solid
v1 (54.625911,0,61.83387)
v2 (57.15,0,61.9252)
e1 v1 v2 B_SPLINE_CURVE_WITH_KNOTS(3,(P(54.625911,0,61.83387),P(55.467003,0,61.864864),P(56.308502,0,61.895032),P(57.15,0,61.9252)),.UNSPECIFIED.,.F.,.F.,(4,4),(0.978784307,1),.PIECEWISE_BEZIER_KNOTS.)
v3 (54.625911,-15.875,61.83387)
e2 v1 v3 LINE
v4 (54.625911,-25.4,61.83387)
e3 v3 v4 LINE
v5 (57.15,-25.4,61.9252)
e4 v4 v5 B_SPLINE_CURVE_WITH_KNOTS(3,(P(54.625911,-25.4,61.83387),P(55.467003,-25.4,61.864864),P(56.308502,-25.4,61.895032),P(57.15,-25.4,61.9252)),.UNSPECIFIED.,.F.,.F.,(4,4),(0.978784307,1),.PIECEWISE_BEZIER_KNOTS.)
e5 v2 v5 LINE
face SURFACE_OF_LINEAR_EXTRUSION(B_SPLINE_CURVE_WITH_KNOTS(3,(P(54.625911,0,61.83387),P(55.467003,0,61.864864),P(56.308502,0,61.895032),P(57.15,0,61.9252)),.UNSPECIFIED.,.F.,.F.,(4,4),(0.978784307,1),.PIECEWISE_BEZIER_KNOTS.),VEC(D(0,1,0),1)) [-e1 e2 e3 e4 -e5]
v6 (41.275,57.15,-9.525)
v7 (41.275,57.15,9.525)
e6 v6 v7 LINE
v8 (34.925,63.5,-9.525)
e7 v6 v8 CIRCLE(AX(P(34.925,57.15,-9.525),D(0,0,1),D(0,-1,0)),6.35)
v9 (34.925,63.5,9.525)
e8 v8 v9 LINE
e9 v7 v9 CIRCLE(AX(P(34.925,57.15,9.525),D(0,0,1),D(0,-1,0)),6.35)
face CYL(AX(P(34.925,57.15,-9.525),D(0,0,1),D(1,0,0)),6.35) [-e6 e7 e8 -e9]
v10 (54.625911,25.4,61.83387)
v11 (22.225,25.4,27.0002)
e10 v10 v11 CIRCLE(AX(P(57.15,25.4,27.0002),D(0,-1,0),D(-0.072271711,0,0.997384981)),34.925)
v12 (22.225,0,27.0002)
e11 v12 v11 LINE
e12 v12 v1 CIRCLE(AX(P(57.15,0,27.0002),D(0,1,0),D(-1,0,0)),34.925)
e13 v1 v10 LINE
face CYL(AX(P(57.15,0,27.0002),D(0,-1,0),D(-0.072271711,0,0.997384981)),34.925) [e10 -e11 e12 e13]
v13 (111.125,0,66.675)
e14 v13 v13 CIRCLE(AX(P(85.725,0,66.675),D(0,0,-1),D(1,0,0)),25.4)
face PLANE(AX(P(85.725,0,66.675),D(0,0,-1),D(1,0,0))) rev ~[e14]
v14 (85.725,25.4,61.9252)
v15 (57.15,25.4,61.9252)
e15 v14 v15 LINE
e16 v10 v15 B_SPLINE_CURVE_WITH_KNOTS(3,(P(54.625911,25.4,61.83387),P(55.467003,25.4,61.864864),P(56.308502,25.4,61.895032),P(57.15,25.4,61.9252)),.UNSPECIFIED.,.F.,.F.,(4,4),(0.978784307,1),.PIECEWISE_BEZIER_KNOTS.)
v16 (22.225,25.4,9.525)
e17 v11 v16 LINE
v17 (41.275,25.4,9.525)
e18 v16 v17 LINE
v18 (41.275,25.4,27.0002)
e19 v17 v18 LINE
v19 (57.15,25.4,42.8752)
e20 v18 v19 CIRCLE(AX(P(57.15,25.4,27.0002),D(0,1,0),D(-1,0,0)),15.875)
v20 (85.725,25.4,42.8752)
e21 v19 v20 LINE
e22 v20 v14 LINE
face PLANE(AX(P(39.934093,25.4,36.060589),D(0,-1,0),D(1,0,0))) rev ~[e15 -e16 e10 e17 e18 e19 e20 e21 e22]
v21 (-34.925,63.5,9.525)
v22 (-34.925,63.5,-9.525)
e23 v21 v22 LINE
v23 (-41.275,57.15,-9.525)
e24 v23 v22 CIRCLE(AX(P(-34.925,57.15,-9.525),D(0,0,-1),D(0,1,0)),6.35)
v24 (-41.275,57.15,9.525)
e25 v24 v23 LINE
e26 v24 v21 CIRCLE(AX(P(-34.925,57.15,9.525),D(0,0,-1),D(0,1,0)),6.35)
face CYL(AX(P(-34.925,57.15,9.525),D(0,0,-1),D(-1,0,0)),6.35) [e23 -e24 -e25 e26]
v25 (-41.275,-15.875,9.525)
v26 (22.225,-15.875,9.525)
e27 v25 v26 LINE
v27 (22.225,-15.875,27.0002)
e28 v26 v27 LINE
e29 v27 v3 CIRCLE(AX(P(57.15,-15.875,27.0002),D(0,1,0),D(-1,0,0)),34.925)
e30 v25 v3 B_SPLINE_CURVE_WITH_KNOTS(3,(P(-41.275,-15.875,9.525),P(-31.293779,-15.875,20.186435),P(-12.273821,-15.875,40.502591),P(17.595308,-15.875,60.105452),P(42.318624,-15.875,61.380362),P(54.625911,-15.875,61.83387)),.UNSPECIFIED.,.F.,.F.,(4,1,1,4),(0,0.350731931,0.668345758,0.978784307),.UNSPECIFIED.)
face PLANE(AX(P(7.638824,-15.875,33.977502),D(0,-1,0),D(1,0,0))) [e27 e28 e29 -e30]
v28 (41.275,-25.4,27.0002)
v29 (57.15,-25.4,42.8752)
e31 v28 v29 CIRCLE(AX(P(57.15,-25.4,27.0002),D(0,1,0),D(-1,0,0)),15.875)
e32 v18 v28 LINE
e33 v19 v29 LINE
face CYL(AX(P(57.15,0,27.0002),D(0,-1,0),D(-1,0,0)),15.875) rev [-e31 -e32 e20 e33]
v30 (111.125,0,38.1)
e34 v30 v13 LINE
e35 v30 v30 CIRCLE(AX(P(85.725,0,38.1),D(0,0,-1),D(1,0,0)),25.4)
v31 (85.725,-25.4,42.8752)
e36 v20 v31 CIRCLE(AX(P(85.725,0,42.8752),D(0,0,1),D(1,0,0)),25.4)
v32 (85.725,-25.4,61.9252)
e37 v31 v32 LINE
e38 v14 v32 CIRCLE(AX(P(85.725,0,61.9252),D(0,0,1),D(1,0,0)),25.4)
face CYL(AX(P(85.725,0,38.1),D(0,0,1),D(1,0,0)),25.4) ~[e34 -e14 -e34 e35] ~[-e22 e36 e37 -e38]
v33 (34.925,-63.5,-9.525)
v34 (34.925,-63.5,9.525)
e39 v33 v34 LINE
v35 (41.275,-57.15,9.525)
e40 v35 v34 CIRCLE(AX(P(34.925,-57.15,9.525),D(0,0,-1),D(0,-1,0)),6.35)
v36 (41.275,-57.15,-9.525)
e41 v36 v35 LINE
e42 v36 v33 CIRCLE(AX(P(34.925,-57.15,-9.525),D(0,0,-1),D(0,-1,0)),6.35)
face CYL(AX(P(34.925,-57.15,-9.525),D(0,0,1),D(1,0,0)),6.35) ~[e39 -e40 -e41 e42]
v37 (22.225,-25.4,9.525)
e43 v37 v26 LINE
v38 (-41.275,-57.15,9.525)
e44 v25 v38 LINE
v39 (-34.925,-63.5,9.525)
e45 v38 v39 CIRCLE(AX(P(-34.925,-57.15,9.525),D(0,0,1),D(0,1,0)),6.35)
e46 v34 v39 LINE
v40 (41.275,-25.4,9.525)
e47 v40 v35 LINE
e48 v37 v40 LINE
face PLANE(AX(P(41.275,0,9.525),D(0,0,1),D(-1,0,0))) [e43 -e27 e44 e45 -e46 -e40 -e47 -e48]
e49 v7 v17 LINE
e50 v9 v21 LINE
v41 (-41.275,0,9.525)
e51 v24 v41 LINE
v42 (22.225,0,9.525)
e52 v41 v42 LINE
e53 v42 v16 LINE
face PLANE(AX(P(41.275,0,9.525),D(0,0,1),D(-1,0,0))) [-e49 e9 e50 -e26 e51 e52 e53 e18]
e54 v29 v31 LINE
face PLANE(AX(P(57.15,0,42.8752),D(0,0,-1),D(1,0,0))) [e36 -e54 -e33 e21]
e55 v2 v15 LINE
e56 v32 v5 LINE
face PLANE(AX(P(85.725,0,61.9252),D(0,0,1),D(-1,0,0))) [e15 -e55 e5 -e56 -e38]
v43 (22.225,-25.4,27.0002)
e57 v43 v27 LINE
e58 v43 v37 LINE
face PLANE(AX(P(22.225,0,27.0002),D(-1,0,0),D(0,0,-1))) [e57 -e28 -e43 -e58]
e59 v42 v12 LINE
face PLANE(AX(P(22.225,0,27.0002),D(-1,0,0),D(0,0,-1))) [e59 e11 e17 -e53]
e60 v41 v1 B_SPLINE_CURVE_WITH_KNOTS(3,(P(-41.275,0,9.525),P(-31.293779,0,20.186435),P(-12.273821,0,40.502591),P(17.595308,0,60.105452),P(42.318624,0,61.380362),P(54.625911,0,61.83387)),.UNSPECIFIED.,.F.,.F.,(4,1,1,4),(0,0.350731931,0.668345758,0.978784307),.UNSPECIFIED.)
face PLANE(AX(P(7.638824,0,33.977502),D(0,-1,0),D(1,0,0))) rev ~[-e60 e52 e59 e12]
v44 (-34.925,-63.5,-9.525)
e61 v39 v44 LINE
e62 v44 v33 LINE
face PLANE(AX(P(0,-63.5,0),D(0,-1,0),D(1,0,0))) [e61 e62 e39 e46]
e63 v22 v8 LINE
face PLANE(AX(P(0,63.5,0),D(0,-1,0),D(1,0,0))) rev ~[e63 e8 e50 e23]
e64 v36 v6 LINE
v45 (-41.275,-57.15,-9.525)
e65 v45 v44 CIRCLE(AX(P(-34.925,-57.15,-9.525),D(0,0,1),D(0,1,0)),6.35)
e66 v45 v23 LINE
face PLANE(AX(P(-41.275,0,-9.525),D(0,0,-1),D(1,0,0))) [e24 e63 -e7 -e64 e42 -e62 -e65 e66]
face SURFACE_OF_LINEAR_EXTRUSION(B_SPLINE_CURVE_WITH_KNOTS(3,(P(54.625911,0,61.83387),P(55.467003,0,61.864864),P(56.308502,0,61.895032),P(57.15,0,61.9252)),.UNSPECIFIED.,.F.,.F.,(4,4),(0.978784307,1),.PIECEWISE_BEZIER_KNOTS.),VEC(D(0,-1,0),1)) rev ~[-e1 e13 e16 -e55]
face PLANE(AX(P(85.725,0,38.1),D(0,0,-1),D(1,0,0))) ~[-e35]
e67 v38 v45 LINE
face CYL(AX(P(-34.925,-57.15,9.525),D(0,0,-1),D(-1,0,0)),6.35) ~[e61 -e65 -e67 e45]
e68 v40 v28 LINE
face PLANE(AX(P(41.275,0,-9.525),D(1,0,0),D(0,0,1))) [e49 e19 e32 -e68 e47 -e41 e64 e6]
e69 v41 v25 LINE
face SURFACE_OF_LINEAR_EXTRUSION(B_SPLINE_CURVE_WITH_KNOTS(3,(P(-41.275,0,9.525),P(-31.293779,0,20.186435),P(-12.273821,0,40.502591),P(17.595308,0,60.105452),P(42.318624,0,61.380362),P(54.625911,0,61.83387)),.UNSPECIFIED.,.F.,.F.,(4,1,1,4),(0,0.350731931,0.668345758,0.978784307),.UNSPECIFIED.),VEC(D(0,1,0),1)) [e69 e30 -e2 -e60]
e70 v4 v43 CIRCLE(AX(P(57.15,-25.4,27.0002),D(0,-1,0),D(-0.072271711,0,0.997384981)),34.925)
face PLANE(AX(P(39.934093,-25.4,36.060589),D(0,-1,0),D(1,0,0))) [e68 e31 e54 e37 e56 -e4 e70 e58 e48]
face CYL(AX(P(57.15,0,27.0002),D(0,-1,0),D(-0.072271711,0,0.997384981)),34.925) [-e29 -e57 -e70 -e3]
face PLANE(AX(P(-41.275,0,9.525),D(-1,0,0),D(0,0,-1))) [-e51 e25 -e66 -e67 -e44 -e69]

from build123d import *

# Parameters (mm, degrees)
F1_DEPTH = 63.5
F0_W     = 25.4
F0_H     = 19.05
F2_DEPTH = 25.4
F3_DEPTH = 15.875
F5_R     = 6.35


# Not quite as in the source:
# - a feature names something its author has since deleted; it is built from what else it names


with BuildPart() as f1:
    # F0 (on Front) → F1 (new body, symmetric)
    with BuildSketch(Plane.XZ):
        Polygon((41.275, -9.525), (41.275, 9.525), (22.225, 9.525), (-41.275, 9.525), (-41.275, -9.525), align=None)
    extrude(amount=F1_DEPTH, both=True)

    # F0 (on Front) → F2 (join, symmetric)
    with BuildSketch(Plane.XZ):
        with BuildLine():
            Line((22.225, 9.525), (41.275, 9.525))
            Line((41.275, 9.525), (41.275, 27.0002))
            ThreePointArc((41.275, 27.0002), (45.9246798487, 38.2255201513), (57.15, 42.8752))
            Line((57.15, 42.8752), (60.325, 42.8752))
            Line((60.325, 42.8752), (60.325, 61.9252))
            Line((60.325, 61.9252), (57.15, 61.9252))
            add(Edge.make_bspline(
                [(54.6259105013, 61.8338704526), (55.4670032291, 61.8648637063), (56.3085016145, 61.8950318532), (57.15, 61.9252)],
                knots=[0.9787843068, 0.9787843068, 0.9787843068, 0.9787843068, 1, 1, 1, 1], degree=3))
            ThreePointArc((54.6259105013, 61.8338704526), (31.5774614993, 50.7867697323), (22.225, 27.0002))
            Line((22.225, 27.0002), (22.225, 9.525))
        make_face()
        with Locations((73.025, 52.4002)):
            Rectangle(F0_W, F0_H)
    extrude(amount=F2_DEPTH, both=True)

    # F0 (on Front) → F3 (join)
    with BuildSketch(Plane.XZ):
        with BuildLine():
            Line((-41.275, 9.525), (22.225, 9.525))
            Line((22.225, 9.525), (22.225, 27.0002))
            ThreePointArc((22.225, 27.0002), (31.5774614993, 50.7867697323), (54.6259105013, 61.8338704526))
            add(Edge.make_bspline(
                [(-41.275, 9.525), (-31.2937791868, 20.1864348925), (-12.273821172, 40.5025913853), (17.5953077761, 60.105451895), (42.3186244489, 61.380361789), (54.6259105013, 61.8338704526)],
                knots=[0, 0, 0, 0, 0.3507319306, 0.6683457584, 0.9787843068, 0.9787843068, 0.9787843068, 0.9787843068], degree=3))
        make_face()
    extrude(amount=F3_DEPTH)

    # F0 (on Front) → F4 (revolve)
    with BuildSketch(Plane.XZ):
        Polygon((85.725, 61.9252), (85.725, 42.8752), (85.725, 38.1), (111.125, 38.1), (111.125, 66.675), (85.725, 66.675), align=None)
    revolve(axis=Axis((85.725, 0, 52.3875), (0, 0, -1)))

    # F5
    f5_edges = [f1.edges().sort_by_distance(p)[0] for p in [
        (-41.275, -63.5, 0),
        (-41.275, 63.5, 0),
        (41.275, 63.5, 0),
        (41.275, -63.5, 0),
    ]]
    fillet(f5_edges, radius=F5_R)


solid = f1.part
